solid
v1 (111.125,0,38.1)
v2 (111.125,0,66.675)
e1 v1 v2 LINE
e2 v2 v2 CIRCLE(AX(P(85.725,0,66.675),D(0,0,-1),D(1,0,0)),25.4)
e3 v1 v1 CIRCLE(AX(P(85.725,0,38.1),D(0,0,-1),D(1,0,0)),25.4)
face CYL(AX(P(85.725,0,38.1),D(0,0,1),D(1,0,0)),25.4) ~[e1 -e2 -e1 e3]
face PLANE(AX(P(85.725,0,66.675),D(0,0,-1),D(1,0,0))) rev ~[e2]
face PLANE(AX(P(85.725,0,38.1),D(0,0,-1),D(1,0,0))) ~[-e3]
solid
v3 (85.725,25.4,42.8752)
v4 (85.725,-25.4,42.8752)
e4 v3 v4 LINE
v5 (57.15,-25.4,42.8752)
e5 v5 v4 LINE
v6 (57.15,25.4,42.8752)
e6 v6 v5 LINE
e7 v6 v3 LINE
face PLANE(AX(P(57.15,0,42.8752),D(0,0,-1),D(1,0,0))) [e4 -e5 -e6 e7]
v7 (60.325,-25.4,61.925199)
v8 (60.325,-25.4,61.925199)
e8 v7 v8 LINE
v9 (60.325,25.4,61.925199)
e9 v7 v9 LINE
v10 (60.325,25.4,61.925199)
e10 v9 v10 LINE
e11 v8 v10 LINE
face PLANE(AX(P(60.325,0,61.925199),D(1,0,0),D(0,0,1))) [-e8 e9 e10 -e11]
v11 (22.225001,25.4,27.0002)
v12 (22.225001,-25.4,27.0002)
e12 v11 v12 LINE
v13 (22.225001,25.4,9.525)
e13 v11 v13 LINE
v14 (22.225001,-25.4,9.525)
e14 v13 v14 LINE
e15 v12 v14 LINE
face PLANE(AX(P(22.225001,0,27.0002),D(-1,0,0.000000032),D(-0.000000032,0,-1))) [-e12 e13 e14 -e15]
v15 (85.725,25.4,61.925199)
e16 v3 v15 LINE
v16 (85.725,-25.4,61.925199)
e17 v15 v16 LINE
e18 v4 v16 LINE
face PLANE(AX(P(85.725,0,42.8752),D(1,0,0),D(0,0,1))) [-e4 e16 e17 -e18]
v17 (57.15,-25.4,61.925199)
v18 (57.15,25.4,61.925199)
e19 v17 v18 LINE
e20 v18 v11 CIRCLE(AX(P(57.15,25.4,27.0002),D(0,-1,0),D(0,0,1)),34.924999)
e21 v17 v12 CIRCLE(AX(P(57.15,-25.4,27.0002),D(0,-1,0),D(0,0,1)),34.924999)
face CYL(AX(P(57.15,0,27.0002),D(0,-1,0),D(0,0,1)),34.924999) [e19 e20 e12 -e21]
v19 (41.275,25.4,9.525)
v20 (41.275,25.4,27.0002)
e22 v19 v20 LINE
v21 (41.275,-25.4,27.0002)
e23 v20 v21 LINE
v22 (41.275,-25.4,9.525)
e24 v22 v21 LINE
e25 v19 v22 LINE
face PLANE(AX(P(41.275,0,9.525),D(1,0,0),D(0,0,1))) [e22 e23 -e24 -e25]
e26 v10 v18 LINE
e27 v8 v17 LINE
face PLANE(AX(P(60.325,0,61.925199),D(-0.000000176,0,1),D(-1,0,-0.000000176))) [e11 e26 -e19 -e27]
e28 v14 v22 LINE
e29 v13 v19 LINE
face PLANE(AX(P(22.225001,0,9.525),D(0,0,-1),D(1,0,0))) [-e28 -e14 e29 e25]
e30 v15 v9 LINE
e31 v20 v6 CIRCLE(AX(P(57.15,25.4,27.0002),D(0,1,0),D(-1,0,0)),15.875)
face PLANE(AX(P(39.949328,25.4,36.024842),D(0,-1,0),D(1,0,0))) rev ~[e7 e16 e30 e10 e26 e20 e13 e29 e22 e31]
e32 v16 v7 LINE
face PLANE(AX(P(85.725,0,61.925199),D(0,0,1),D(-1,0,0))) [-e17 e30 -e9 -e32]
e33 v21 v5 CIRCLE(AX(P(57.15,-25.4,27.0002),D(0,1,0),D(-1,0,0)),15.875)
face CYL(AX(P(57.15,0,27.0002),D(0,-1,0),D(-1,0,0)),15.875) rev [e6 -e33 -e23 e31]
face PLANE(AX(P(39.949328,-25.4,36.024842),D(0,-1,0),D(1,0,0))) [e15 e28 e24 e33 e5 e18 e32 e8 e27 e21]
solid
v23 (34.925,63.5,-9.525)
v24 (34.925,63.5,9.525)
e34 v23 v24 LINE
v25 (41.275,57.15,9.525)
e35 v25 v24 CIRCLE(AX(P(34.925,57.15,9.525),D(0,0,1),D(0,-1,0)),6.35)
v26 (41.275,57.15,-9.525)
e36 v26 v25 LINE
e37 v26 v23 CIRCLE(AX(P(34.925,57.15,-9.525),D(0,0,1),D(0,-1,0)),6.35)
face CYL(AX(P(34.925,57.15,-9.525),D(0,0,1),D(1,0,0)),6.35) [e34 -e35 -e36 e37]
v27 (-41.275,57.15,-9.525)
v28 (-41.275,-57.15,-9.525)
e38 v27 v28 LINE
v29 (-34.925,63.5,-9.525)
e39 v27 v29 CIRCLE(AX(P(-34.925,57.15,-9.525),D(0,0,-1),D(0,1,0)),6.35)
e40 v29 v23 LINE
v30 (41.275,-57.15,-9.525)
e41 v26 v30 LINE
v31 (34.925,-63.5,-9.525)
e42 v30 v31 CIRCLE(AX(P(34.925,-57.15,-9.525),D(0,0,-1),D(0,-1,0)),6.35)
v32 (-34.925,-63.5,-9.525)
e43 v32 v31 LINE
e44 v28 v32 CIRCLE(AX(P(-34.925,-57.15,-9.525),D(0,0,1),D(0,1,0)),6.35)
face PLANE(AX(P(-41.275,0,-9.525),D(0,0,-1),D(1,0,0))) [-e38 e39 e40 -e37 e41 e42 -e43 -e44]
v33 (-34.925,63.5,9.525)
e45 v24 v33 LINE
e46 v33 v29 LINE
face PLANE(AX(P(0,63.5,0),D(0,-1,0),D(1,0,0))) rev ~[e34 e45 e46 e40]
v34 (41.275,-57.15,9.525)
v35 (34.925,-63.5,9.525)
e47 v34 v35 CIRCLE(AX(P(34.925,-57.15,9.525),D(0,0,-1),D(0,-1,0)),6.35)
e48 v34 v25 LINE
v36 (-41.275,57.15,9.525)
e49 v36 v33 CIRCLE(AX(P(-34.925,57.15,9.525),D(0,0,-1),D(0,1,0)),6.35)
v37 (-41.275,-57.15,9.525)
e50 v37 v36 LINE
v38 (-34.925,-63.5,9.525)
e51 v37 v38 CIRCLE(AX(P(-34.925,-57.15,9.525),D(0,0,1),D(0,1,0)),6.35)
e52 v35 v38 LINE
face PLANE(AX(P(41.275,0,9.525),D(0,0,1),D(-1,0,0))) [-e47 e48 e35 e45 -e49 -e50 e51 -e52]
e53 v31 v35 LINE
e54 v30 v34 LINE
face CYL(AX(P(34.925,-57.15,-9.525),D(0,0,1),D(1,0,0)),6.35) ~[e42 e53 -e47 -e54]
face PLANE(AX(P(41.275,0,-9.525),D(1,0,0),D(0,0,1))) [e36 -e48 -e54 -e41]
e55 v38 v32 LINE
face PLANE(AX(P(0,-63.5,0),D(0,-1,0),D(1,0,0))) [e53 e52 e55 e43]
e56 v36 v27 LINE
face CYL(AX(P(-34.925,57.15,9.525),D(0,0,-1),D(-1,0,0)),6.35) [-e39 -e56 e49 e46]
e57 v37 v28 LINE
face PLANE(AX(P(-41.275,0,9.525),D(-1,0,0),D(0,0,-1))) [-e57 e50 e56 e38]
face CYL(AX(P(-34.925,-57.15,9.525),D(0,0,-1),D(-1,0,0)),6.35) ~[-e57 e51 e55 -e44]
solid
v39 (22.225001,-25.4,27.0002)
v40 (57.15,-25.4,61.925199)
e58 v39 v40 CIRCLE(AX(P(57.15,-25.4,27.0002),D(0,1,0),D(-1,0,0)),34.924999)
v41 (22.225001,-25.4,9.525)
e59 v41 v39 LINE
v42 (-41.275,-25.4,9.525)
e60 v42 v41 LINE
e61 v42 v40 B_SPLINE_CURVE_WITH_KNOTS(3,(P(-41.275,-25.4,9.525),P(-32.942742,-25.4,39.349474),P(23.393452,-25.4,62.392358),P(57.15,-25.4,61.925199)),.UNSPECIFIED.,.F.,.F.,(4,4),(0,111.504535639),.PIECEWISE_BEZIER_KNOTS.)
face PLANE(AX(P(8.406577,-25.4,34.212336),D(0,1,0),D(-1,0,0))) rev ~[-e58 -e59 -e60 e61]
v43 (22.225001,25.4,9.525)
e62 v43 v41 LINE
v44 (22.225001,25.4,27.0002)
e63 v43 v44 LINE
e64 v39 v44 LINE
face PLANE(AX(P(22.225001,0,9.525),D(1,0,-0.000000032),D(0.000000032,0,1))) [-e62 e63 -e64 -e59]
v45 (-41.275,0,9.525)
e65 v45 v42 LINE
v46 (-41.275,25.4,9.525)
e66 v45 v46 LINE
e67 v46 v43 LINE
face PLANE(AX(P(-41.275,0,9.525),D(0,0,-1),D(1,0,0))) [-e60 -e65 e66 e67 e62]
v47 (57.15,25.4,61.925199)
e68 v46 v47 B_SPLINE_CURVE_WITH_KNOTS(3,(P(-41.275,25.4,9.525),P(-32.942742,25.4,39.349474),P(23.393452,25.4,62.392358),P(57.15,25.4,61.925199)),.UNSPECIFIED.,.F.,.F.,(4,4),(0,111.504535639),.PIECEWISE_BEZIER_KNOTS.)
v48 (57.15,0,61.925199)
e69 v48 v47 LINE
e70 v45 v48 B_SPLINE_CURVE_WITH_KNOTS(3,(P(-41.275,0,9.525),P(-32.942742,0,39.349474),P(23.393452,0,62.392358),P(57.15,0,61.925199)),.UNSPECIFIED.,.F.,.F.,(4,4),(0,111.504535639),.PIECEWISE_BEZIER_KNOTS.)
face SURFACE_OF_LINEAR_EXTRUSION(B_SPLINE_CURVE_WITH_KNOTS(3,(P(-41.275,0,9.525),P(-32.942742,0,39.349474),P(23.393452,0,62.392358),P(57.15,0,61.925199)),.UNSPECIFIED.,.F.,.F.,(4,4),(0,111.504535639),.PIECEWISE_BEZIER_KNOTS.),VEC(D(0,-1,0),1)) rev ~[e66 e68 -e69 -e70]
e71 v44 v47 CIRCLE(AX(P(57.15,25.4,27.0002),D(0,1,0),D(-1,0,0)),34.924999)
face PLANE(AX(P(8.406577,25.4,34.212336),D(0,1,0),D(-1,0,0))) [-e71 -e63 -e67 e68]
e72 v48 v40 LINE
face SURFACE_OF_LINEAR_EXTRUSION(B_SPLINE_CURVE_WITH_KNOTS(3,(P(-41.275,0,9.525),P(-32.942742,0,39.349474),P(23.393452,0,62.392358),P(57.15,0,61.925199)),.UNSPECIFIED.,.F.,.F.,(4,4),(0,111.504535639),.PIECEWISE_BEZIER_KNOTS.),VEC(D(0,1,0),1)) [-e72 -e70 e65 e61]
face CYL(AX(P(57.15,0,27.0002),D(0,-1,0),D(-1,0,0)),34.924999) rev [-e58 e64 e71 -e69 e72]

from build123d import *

# Parameters (mm, degrees)
F1_DEPTH = 63.5
F2_DEPTH = 25.4
F3_DEPTH = 25.4
F5_R     = 6.35


# Not quite as in the source:
# - ends of sketch curves that miss each other by under 0.0002 mm in the source are joined
# - a feature names something its author has since deleted; it is built from what else it names


with BuildPart() as f1:
    # F0 (on Front) → F1 (new body, symmetric)
    with BuildSketch(Plane.XZ):
        Polygon((-41.275, 9.525), (-41.275, -9.525), (41.275, -9.525), (41.275, 9.525), (22.2250005586, 9.525), align=None)
    extrude(amount=F1_DEPTH, both=True)

    # F5
    f5_edges = [f1.edges().sort_by_distance(p)[0] for p in [
        (-41.275, -63.5, 0),
        (41.275, -63.5, 0),
        (41.275, 63.5, 0),
        (-41.275, 63.5, 0),
    ]]
    fillet(f5_edges, radius=F5_R)


with BuildPart() as f2:
    # F0 (on Front) → F2 (new body, symmetric)
    with BuildSketch(Plane.XZ):
        with BuildLine():
            Line((22.2250005586, 9.525), (41.275, 9.525))
            Line((41.275, 9.525), (41.275, 27.0002))
            ThreePointArc((41.275, 27.0002), (45.9246798487, 38.2255201513), (57.15, 42.8752))
            Line((57.15, 42.8752), (60.325, 42.8752))
            Line((60.325, 42.8752), (60.325, 61.9251994414))
            Line((60.325, 61.9251994414), (57.15, 61.9251988828))
            ThreePointArc((57.15, 61.9251988828), (32.454296457, 51.695903543), (22.2250011172, 27.0002))
            Line((22.2250011172, 27.0002), (22.2250005586, 9.525))
        make_face()
        Polygon((67.4121566832, 61.9251988828), (60.325, 61.9251988828), (60.325, 42.8752), (85.725, 42.8752), (85.725, 61.9251988828), align=None)
    extrude(amount=F2_DEPTH, both=True)


with BuildPart() as f3:
    # F0 (on Front) → F3 (new body, symmetric)
    with BuildSketch(Plane.XZ):
        with BuildLine():
            add(Edge.make_bspline(
                [(-41.275, 9.525), (-32.9427421093, 39.3494740129), (23.3934521675, 62.3923577368), (57.15, 61.9251988828)],
                knots=[0, 0, 0, 0, 111.5045356385, 111.5045356385, 111.5045356385, 111.5045356385], degree=3))
            Line((-41.275, 9.525), (22.2250005586, 9.525))
            Line((22.2250005586, 9.525), (22.2250011172, 27.0002))
            ThreePointArc((22.2250011172, 27.0002), (32.454296457, 51.695903543), (57.15, 61.9251988828))
        make_face()
    extrude(amount=F3_DEPTH, both=True)


with BuildPart() as f4:
    # F0 (on Front) → F4 (revolve)
    with BuildSketch(Plane.XZ):
        Polygon((85.725, 66.675), (85.725, 61.9251988828), (85.725, 42.8752), (85.725, 38.1), (111.125, 38.1), (111.125, 66.675), align=None)
    revolve(axis=Axis((85.725, 0, 52.4001994414), (0, 0, -1)))


solid = Compound([f1.part, f2.part, f3.part, f4.part])
